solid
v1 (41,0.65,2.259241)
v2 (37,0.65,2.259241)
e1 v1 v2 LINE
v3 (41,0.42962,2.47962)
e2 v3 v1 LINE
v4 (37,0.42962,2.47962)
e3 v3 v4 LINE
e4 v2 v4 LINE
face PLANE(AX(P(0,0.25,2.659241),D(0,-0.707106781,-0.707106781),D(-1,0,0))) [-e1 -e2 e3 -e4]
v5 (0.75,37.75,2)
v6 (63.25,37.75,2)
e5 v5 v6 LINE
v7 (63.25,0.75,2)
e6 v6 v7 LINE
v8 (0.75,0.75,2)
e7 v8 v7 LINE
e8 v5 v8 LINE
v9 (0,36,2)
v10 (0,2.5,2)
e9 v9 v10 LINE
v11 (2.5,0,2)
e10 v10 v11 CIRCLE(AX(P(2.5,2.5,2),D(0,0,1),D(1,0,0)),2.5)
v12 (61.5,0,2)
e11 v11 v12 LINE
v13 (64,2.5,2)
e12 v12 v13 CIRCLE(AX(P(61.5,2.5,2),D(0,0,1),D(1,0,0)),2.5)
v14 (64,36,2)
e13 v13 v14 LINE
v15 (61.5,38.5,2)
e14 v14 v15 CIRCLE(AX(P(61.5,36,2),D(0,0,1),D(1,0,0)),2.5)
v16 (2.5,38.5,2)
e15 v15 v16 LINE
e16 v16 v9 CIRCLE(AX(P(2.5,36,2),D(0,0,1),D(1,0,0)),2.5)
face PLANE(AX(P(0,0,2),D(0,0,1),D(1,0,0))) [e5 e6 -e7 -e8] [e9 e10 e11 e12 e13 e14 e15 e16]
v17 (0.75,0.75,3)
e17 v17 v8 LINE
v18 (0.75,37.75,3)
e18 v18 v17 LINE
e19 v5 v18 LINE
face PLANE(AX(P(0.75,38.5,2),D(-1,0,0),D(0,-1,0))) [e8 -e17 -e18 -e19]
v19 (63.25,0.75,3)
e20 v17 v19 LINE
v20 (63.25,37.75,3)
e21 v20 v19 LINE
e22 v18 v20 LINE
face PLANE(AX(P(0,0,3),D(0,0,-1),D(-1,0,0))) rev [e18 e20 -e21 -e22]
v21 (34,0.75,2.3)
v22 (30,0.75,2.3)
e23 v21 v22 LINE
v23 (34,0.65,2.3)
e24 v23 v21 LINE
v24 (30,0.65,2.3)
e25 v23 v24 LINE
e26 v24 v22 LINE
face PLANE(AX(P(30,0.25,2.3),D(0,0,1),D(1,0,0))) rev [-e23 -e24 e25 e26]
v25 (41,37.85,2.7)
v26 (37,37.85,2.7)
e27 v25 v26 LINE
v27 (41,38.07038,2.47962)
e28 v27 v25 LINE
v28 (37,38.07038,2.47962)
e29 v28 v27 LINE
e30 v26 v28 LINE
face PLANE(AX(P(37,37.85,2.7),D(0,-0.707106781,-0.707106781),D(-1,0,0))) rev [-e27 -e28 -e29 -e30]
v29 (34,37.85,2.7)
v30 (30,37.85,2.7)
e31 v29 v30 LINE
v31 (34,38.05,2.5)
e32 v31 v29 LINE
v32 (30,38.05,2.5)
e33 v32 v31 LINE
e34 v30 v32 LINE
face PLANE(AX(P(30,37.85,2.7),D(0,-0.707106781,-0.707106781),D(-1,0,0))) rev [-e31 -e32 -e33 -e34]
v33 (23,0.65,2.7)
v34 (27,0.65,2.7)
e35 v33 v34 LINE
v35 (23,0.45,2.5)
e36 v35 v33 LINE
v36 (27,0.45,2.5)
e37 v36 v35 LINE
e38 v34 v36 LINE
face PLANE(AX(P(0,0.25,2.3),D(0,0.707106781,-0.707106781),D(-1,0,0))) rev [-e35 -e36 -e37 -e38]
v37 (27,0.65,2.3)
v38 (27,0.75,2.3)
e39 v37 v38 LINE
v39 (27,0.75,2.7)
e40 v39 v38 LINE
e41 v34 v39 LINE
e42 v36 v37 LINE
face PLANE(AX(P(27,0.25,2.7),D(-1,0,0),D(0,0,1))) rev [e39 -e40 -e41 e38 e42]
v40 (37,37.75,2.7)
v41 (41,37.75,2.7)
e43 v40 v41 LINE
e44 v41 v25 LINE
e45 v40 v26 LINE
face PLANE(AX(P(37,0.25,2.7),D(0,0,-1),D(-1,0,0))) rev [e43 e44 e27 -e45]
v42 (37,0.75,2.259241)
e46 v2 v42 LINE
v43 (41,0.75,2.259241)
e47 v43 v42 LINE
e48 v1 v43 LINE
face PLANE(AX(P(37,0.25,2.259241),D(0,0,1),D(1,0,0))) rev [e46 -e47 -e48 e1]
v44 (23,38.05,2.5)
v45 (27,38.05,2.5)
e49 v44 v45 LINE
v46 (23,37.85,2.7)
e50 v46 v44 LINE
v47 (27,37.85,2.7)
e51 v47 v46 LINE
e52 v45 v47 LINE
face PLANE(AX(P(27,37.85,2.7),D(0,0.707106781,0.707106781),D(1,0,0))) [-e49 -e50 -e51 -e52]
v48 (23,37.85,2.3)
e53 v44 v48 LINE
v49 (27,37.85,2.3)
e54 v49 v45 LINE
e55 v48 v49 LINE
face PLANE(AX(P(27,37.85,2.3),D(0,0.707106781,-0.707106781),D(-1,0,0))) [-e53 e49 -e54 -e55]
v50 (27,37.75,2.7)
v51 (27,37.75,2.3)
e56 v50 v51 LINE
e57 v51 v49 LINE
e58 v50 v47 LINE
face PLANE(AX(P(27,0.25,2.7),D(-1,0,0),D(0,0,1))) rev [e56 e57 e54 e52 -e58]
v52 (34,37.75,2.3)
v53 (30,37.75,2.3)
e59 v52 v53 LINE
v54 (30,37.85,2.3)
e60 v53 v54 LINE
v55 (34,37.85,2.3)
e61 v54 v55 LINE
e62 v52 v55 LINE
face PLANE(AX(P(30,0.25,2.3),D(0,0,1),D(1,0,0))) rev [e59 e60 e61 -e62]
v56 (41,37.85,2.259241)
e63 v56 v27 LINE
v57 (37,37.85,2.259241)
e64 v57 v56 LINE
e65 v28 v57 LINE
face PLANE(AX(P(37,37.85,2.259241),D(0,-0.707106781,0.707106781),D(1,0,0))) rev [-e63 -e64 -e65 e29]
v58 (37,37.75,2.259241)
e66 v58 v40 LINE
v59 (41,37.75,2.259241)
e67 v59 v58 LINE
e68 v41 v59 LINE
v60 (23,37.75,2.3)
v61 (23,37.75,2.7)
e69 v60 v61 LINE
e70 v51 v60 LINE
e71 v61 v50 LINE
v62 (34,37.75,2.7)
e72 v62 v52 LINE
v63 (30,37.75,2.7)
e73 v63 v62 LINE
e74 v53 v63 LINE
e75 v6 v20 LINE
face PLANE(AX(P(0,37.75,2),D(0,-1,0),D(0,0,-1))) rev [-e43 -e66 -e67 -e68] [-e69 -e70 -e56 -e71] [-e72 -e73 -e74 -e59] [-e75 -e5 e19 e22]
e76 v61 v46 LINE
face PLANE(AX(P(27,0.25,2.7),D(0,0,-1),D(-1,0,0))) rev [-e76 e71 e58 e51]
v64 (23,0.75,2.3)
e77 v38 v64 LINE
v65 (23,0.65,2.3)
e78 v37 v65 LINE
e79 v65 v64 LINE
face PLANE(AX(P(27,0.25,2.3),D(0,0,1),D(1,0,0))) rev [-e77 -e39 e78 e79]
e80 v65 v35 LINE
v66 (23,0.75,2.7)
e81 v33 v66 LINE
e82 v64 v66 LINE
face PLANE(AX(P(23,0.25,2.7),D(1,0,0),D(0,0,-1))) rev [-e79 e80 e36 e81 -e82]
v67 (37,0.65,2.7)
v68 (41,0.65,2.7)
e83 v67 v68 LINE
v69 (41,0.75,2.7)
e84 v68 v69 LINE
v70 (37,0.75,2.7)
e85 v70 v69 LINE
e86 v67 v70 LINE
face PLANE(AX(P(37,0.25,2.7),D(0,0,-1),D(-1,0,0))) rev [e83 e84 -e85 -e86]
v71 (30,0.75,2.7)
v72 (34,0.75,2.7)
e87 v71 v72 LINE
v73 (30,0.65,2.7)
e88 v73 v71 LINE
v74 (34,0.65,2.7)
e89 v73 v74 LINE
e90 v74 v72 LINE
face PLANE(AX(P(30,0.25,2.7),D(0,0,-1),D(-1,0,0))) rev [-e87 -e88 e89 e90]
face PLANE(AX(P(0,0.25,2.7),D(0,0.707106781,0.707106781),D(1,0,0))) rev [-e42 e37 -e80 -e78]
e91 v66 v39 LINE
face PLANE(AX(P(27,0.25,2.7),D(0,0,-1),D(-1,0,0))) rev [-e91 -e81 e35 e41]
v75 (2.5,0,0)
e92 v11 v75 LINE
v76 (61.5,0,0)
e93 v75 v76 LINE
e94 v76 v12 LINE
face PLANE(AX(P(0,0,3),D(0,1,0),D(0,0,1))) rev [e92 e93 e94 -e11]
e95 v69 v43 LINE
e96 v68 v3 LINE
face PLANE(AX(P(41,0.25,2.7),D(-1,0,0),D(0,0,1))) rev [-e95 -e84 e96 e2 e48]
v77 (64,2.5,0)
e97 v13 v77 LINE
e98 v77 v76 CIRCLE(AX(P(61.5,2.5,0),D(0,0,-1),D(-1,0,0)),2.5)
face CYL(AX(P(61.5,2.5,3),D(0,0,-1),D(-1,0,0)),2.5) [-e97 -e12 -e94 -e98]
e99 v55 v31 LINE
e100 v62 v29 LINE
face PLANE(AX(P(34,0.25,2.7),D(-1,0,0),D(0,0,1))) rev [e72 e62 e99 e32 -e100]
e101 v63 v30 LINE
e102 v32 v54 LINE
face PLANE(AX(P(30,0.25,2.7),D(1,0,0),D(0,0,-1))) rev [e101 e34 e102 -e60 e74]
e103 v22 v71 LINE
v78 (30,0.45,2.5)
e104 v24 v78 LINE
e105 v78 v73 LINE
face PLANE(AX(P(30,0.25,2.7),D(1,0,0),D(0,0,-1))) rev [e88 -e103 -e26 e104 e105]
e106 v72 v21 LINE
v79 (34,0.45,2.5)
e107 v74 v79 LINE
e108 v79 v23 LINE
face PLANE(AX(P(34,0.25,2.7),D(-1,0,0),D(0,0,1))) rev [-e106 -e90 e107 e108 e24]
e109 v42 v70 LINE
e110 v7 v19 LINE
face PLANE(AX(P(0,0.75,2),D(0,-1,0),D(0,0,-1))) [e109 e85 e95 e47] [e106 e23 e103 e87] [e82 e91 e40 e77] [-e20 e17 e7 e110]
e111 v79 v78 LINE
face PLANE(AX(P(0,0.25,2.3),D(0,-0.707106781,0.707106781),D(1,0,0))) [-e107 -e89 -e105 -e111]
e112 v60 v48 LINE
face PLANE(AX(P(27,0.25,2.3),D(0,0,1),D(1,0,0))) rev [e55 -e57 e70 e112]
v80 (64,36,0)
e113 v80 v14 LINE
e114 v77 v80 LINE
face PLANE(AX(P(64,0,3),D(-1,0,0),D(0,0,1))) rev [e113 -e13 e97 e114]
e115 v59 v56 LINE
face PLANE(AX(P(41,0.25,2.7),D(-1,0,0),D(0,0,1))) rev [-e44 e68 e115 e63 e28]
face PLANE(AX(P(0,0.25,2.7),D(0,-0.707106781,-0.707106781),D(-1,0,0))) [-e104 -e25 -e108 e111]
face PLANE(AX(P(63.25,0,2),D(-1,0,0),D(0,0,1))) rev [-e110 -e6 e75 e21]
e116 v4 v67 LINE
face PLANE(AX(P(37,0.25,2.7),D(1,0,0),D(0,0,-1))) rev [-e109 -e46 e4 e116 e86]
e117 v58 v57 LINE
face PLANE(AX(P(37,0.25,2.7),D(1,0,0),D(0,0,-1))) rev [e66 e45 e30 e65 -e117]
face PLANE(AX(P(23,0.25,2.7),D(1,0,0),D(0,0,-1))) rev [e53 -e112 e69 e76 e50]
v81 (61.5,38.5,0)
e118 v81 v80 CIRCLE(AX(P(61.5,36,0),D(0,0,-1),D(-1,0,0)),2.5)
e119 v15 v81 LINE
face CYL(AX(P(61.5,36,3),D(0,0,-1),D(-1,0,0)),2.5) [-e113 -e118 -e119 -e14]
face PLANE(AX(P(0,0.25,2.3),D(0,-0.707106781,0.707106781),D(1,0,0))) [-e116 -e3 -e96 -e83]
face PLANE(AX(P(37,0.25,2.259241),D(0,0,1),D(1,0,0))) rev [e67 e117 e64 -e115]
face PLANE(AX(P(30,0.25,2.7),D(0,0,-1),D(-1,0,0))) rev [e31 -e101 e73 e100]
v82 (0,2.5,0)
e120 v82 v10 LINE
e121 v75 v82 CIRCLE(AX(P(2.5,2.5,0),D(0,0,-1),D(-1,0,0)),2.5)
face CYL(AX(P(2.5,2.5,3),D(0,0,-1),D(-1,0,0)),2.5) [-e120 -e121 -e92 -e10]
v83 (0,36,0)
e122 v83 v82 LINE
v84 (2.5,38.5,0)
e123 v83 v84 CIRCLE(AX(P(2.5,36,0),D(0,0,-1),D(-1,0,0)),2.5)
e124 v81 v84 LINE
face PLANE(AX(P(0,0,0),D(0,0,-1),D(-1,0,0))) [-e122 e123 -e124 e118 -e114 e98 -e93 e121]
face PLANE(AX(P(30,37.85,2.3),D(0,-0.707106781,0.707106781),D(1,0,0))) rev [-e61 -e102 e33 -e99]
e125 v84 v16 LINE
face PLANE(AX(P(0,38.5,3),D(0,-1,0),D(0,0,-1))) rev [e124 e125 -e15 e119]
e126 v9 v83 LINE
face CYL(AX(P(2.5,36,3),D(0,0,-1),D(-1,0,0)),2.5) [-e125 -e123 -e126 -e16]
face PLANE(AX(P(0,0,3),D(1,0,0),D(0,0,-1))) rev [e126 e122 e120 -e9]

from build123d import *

# Parameters (mm, degrees)
SKETCH1_W                = 64
SKETCH1_H                = 38.5
BOSS_EXTRUDE1_DEPTH      = 3
SKETCH2_W                = 64
SKETCH2_H                = 38.5
SKETCH2_W_2              = 62.5
SKETCH2_H_2              = 37
CUT_EXTRUDE1_DEPTH       = 1
BOSS_EXTRUDE2_DEPTH      = 0.5
BOSS_EXTRUDE2_DEPTH_BACK = 37.5
SKETCH3_W                = 4
SKETCH3_H                = 0.4
SKETCH3_H_2              = 0.44075926
CHAMFER8_SIZE            = 0.4
CHAMFER9_SIZE            = 0.4
CHAMFER10_SIZE           = 0.4
CHAMFER11_SIZE           = 0.4
FILLET7_R                = 2.5


with BuildPart() as part:
    # Sketch1 → Boss-Extrude1 (new body)
    with BuildSketch(Plane.XY):
        with Locations((32, 19.25)):
            Rectangle(SKETCH1_W, SKETCH1_H)
    extrude(amount=BOSS_EXTRUDE1_DEPTH)

    # Sketch2 → Cut-Extrude1 (cut)
    with BuildSketch(Plane.XY.offset(3)):
        with Locations((32, 19.25)):
            Rectangle(SKETCH2_W, SKETCH2_H)
        with Locations((32, 19.25)):
            Rectangle(SKETCH2_W_2, SKETCH2_H_2, mode=Mode.SUBTRACT)
    extrude(amount=-CUT_EXTRUDE1_DEPTH, mode=Mode.SUBTRACT)

    # Sketch3 → Boss-Extrude2 (add, two sides: drawn at the far end of the back side and taken through both)
    with BuildSketch(Plane.XZ.offset(-0.75).offset(-BOSS_EXTRUDE2_DEPTH_BACK)):
        with Locations((32, 2.5)):
            Rectangle(SKETCH3_W, SKETCH3_H)
        with Locations((39, 2.47962037)):
            Rectangle(SKETCH3_W, SKETCH3_H_2)
        with Locations((25, 2.5)):
            Rectangle(SKETCH3_W, SKETCH3_H)
    extrude(amount=BOSS_EXTRUDE2_DEPTH + BOSS_EXTRUDE2_DEPTH_BACK)

    # Chamfer8
    # the kernel refuses this chamfer: 0.4 mm, written as the material it takes off along each edge
    with BuildSketch(Plane(origin=(42.028673195, 0.25, 2.25924074), x_dir=(0, 0.9996219169112968, -0.02749587661058628), z_dir=(-1, 0, 0)), Plane(origin=(35.971326805, 0.25, 2.7), x_dir=(0, 0.9996219169112968, 0.02749587661058628), z_dir=(1, 0, 0))) as chamfer8_piece_1:
        Polygon((CHAMFER8_SIZE * 0.999621916911, -CHAMFER8_SIZE * 0.0274958766106), (-CHAMFER8_SIZE * 0.0274958766106, -CHAMFER8_SIZE * 0.999621916911), (0, 0), align=None)
    extrude(amount=6.05734639, mode=Mode.SUBTRACT)

    # Chamfer9
    # the kernel refuses this chamfer: 0.4 mm, written as the material it takes off along each edge
    with BuildSketch(Plane(origin=(35.028673195, 0.25, 2.3), x_dir=(0, 0.9996219169112968, -0.02749587661058628), z_dir=(-1, 0, 0)), Plane(origin=(28.971326805, 0.25, 2.7), x_dir=(0, 0.9996219169112968, 0.02749587661058628), z_dir=(1, 0, 0))) as chamfer9_piece_1:
        Polygon((CHAMFER9_SIZE * 0.999621916911, -CHAMFER9_SIZE * 0.0274958766106), (-CHAMFER9_SIZE * 0.0274958766106, -CHAMFER9_SIZE * 0.999621916911), (0, 0), align=None)
    extrude(amount=6.05734639, mode=Mode.SUBTRACT)

    # Chamfer10
    # the kernel refuses this chamfer: 0.4 mm, written as the material it takes off along each edge
    with BuildSketch(Plane(origin=(21.971326805, 0.25, 2.3), x_dir=(0, 0.9996219169112968, -0.02749587661058628), z_dir=(1, 0, 0)), Plane(origin=(28.028673195, 0.25, 2.7), x_dir=(0, 0.9996219169112968, 0.02749587661058628), z_dir=(-1, 0, 0))) as chamfer10_piece_1:
        Polygon((CHAMFER10_SIZE * 0.999621916911, CHAMFER10_SIZE * 0.0274958766106), (-CHAMFER10_SIZE * 0.0274958766106, CHAMFER10_SIZE * 0.999621916911), (0, 0), align=None)
    extrude(amount=6.05734639, mode=Mode.SUBTRACT)

    # Chamfer11
    # the kernel refuses this chamfer: 0.4 mm, written as the material it takes off along each edge
    with BuildSketch(Plane(origin=(42.028673195, 38.25, 2.25924074), x_dir=(0, -0.9996219169112968, -0.02749587661058658), z_dir=(-1, 0, 0)), Plane(origin=(35.971326805, 38.25, 2.7), x_dir=(0, -0.9996219169112968, 0.02749587661058658), z_dir=(1, 0, 0)), Plane(origin=(35.028673195, 38.25, 2.3), x_dir=(0, -0.9996219169112968, -0.02749587661058658), z_dir=(-1, 0, 0)), Plane(origin=(28.971326805, 38.25, 2.7), x_dir=(0, -0.9996219169112968, 0.02749587661058658), z_dir=(1, 0, 0))) as chamfer11_piece_1:
        Polygon((CHAMFER11_SIZE * 0.999621916911, CHAMFER11_SIZE * 0.0274958766106), (-CHAMFER11_SIZE * 0.0274958766106, CHAMFER11_SIZE * 0.999621916911), (0, 0), align=None)
    extrude(amount=6.05734639, mode=Mode.SUBTRACT)
    with BuildSketch(Plane(origin=(21.971326805, 38.25, 2.3), x_dir=(0, -0.9996219169112968, -0.02749587661058658), z_dir=(1, 0, 0)), Plane(origin=(28.028673195, 38.25, 2.7), x_dir=(0, -0.9996219169112968, 0.02749587661058658), z_dir=(-1, 0, 0))) as chamfer11_piece_2:
        Polygon((CHAMFER11_SIZE * 0.999621916911, -CHAMFER11_SIZE * 0.0274958766106), (-CHAMFER11_SIZE * 0.0274958766106, -CHAMFER11_SIZE * 0.999621916911), (0, 0), align=None)
    extrude(amount=6.05734639, mode=Mode.SUBTRACT)

    # Fillet7
    fillet7_edges = [part.edges().sort_by_distance(p)[0] for p in [
        (0, 38.5, 1),
        (64, 38.5, 1),
        (64, 0, 1),
        (0, 0, 1),
    ]]
    fillet(fillet7_edges, radius=FILLET7_R)


solid = part.part
